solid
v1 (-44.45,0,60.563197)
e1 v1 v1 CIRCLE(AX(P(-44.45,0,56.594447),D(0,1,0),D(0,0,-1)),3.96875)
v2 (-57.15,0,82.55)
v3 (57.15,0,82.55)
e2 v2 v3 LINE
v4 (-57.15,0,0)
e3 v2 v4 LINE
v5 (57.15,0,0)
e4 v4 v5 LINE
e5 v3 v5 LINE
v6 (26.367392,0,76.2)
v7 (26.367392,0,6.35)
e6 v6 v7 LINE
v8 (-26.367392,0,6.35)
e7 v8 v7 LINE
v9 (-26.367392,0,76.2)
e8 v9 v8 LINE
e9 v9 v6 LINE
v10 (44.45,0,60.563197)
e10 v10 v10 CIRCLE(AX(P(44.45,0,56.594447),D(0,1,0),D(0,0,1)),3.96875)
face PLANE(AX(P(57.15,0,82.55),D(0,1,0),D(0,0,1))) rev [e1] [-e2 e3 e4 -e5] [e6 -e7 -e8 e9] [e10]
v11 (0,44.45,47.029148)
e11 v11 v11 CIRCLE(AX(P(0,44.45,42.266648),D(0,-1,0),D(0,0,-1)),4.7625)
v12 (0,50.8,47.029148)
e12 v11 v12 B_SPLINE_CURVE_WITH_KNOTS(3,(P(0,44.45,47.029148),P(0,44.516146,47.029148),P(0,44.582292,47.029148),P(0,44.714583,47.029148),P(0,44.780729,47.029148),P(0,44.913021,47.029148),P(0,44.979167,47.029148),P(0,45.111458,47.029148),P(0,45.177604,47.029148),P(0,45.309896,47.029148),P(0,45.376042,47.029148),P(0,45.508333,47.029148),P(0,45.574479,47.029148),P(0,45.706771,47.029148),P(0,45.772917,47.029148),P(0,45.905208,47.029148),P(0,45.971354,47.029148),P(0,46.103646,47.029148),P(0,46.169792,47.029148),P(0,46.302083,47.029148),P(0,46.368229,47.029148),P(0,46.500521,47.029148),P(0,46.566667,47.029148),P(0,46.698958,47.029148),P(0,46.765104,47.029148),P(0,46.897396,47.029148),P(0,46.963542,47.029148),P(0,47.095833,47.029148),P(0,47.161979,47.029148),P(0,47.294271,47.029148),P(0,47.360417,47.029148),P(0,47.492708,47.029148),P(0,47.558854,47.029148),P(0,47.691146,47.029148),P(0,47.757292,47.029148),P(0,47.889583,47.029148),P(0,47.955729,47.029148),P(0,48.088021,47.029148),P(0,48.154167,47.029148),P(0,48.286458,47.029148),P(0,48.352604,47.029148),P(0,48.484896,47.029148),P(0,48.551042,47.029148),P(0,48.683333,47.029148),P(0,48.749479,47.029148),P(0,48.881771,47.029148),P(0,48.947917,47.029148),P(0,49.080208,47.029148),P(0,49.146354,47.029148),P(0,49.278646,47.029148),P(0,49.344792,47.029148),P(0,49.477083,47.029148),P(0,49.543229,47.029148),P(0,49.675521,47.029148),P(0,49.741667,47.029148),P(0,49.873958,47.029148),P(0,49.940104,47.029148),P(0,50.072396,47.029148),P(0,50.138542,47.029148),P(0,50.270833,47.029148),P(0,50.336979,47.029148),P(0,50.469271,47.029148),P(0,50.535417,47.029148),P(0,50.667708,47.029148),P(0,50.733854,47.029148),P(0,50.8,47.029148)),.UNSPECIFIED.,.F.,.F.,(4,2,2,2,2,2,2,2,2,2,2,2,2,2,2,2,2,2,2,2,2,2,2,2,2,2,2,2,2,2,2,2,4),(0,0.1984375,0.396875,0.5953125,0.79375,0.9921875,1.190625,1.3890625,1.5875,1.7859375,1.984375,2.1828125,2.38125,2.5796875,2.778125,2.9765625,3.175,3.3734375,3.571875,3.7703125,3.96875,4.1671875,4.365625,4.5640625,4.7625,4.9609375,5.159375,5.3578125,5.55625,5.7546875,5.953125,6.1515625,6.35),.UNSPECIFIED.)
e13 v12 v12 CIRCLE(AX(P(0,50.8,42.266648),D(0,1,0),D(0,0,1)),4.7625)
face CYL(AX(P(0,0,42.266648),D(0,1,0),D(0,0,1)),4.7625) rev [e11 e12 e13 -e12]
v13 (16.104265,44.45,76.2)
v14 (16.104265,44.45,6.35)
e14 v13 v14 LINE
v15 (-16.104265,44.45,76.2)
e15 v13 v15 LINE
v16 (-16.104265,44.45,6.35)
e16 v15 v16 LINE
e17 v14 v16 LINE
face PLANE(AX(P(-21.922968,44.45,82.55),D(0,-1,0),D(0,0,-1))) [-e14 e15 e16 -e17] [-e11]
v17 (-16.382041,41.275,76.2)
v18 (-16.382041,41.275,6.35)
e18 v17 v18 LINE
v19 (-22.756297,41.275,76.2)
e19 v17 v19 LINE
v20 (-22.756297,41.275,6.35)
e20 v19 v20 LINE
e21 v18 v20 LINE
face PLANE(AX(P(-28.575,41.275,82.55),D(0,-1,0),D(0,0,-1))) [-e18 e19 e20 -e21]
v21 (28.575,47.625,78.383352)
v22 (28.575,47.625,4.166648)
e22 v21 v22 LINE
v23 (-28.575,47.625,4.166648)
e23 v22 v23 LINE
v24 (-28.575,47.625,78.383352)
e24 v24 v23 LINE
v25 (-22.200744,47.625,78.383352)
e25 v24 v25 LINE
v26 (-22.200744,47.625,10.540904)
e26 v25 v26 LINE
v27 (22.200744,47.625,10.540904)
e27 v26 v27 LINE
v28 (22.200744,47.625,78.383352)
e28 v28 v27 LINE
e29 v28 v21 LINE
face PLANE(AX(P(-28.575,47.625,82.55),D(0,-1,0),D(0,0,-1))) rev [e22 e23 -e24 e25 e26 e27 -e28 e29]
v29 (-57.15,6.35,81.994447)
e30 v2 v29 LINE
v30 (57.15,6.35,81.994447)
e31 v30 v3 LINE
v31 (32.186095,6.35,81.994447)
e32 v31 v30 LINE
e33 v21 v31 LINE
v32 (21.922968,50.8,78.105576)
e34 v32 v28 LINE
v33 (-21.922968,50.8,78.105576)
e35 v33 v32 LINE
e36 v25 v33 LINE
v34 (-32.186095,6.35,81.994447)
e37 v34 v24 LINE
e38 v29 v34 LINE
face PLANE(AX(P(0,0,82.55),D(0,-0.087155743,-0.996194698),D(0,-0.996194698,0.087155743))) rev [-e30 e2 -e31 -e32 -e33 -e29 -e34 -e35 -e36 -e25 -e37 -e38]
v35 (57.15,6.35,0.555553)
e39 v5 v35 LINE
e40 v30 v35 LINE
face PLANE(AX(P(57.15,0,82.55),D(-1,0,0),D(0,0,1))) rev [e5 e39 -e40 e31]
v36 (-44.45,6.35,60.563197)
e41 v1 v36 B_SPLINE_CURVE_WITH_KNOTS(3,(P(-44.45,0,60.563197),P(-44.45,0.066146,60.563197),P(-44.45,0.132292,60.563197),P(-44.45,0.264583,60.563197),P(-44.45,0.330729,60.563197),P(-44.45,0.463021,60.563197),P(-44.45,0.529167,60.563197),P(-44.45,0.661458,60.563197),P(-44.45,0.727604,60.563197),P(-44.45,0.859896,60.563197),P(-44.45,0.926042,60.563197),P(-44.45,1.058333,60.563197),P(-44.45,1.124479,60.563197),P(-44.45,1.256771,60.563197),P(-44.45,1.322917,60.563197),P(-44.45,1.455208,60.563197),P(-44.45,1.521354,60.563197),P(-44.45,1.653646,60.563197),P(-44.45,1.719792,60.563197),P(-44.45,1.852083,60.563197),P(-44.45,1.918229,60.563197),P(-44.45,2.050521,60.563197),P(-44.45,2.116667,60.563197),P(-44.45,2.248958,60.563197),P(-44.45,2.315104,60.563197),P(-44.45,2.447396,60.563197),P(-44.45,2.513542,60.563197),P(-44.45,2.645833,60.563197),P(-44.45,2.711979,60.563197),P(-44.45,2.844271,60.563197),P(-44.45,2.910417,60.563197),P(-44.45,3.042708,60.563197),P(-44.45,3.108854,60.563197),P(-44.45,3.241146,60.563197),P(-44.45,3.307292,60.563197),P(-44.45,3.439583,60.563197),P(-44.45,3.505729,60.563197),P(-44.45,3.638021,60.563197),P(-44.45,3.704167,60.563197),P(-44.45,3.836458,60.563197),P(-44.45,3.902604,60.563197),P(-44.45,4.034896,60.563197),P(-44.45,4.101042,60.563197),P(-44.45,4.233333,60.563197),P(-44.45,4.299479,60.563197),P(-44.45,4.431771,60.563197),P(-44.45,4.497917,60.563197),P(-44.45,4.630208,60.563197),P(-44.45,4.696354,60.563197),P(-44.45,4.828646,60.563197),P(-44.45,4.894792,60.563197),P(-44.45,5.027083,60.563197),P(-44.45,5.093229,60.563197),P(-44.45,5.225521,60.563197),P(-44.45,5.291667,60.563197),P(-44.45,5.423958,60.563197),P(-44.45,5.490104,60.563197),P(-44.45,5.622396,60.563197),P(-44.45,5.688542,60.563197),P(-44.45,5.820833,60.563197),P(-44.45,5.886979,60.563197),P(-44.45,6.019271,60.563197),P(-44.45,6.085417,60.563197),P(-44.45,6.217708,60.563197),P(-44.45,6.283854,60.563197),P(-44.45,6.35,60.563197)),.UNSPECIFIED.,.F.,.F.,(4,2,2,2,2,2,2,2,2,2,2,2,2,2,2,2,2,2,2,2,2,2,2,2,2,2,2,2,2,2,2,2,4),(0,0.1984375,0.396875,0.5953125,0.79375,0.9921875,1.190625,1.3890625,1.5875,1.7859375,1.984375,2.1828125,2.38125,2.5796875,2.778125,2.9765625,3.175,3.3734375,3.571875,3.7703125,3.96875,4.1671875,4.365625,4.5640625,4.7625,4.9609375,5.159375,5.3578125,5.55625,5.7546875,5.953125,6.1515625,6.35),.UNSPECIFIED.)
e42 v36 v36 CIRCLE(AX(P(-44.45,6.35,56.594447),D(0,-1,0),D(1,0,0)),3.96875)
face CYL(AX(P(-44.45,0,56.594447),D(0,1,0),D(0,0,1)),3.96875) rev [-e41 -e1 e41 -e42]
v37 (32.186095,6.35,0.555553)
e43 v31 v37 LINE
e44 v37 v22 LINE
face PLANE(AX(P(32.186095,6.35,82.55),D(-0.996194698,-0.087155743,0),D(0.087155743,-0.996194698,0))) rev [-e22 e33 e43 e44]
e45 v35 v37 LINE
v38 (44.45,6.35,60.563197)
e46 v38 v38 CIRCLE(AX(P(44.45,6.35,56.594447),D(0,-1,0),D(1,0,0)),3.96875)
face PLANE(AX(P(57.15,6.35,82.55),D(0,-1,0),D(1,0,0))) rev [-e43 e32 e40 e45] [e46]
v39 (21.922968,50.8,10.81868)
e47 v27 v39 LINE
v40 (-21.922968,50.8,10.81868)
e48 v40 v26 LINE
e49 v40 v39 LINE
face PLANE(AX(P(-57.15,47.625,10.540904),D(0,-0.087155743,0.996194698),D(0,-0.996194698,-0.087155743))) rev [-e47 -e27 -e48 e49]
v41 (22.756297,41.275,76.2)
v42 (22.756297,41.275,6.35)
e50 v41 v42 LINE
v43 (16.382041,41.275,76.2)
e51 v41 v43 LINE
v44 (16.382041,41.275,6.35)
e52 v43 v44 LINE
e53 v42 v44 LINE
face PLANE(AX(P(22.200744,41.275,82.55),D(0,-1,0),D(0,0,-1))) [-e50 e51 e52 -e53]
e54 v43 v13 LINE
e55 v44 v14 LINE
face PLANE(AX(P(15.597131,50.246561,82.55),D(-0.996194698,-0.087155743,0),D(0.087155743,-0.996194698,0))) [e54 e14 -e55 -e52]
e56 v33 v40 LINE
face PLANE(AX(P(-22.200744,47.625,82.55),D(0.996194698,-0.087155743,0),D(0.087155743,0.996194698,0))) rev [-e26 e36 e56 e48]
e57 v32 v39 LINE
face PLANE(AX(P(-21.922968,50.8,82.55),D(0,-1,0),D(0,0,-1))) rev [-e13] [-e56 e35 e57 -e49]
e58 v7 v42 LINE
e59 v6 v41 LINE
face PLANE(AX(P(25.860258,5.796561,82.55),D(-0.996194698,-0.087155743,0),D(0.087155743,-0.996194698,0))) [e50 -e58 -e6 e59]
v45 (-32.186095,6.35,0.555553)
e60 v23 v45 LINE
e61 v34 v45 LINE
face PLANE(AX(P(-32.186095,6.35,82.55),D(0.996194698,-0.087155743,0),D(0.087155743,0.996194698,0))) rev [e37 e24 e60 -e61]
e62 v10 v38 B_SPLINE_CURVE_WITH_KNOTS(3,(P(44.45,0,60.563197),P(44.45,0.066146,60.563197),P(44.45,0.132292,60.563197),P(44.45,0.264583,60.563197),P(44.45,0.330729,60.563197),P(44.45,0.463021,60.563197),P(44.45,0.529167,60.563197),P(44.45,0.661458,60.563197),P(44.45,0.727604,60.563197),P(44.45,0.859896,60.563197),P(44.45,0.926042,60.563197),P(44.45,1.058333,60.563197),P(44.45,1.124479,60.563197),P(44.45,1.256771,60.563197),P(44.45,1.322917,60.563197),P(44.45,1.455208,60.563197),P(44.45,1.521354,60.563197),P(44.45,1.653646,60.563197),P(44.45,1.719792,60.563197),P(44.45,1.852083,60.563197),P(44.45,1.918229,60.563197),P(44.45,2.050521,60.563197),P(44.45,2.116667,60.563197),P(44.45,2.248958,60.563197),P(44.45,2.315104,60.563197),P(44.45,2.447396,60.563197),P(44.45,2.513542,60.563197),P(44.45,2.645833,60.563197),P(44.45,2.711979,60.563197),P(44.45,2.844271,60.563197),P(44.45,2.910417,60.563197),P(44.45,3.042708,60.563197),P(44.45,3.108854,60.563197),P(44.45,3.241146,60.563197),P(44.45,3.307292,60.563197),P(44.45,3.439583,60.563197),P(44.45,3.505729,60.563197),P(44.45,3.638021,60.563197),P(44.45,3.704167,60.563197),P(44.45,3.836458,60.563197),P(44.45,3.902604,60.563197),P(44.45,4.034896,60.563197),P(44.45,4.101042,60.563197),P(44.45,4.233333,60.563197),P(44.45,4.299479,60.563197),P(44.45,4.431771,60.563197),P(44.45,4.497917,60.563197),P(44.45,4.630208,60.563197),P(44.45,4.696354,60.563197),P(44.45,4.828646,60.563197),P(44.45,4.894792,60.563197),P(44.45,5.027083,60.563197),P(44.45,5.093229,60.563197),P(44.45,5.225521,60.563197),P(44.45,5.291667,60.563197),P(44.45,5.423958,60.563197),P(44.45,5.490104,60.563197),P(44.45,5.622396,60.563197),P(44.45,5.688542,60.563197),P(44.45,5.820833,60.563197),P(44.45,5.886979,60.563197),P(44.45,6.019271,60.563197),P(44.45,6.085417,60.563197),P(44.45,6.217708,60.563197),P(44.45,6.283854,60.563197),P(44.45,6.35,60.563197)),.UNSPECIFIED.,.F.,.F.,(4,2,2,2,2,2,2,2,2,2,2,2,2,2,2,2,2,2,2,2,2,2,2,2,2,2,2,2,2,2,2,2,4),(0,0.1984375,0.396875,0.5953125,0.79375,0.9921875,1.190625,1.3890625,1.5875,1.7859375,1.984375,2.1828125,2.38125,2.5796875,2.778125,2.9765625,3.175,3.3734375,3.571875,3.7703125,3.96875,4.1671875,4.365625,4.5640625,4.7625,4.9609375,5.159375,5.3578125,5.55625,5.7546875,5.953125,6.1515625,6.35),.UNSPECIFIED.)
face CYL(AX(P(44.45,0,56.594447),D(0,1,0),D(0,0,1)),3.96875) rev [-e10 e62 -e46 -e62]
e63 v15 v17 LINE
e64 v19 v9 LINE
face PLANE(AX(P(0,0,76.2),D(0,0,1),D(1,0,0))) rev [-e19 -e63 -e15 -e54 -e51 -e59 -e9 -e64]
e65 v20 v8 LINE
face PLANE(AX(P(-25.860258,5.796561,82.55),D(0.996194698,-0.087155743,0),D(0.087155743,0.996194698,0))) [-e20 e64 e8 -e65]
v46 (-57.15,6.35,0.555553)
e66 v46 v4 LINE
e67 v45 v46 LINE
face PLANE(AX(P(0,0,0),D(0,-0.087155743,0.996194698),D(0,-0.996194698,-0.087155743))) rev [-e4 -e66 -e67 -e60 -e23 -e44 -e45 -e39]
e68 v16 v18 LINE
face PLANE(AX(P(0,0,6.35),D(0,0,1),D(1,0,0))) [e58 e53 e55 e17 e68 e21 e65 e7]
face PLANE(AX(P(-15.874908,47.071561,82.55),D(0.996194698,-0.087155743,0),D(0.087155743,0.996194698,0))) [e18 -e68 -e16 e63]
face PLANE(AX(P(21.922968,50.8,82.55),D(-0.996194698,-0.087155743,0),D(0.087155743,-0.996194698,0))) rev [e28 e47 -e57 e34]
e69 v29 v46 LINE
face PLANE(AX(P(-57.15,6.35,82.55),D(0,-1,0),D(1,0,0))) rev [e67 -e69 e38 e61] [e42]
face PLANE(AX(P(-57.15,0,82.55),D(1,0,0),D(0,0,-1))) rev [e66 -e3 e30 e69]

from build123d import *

# Parameters (mm, degrees)
BOSS_EXTRUDE1_DEPTH     = 82.55
SHELL1_START            = 6.35
SHELL1_DEPTH            = 69.85
SKETCH4_W               = 176.485735693
SKETCH4_H               = 90.097834431
CUT_EXTRUDE1_DEPTH      = 25.4
CUT_EXTRUDE2_DEPTH      = 113.522286681
CUT_EXTRUDE2_DEPTH_BACK = 113.522286681
SKETCH8_R               = 4.7625
SKETCH8_R_2             = 3.96875
CUT_EXTRUDE3_DEPTH      = 113.522286681


# Read off the part's stored shape, not the designer's step: Shell1
with BuildPart() as part:
    # Sketch1 → Boss-Extrude1 (new body)
    with BuildSketch(Plane.XY):
        Polygon((57.15, 0), (-57.15, 0), (-57.15, 6.35), (-32.186094587, 6.35), (-28.575, 47.625), (-22.200744032, 47.625), (-21.922967525, 50.8), (21.922967525, 50.8), (22.200744032, 47.625), (28.575, 47.625), (32.186094587, 6.35), (57.15, 6.35), align=None)
    extrude(amount=BOSS_EXTRUDE1_DEPTH)

    # Shell1 outline → Shell1 (cut)
    with BuildSketch(Plane.XY.offset(SHELL1_START)):
        Polygon((26.367391632, 0), (22.756297045, 41.275), (16.382041077, 41.275), (16.10426457, 44.45), (-16.10426457, 44.45), (-16.382041077, 41.275), (-22.756297045, 41.275), (-26.367391632, 0), align=None)
    extrude(amount=SHELL1_DEPTH, mode=Mode.SUBTRACT)

    # Sketch4 → Cut-Extrude1 (cut)
    with BuildSketch(Plane(origin=(0, 0, 0), x_dir=(1, 0, 0), z_dir=(0, 0.08715574274765504, -0.9961946980917459))):
        with Locations((12.432297096, -27.899571849)):
            Rectangle(SKETCH4_W, SKETCH4_H)
    cut_extrude1 = extrude(amount=CUT_EXTRUDE1_DEPTH, mode=Mode.SUBTRACT)

    # Sketch7 → Cut-Extrude2 (cut, two sides: drawn at the far end of the back side and taken through both)
    with BuildSketch(Plane(origin=(0, 0, 0), x_dir=(0, 0, -1), z_dir=(1, 0, 0)).offset(-CUT_EXTRUDE2_DEPTH_BACK)):
        Polygon((-4.1666476, 47.625), (-10.540903569, 47.625), (-10.818680076, 50.8), (-4.444424107, 50.8), align=None)
    extrude(amount=CUT_EXTRUDE2_DEPTH + CUT_EXTRUDE2_DEPTH_BACK, mode=Mode.SUBTRACT)

    # Mirror1: Cut-Extrude1 across plane
    add(cut_extrude1.mirror(Plane.XY.offset(41.275)), mode=Mode.SUBTRACT)

    # Sketch8 → Cut-Extrude3 (cut, through all)
    with BuildSketch(Plane(origin=(0, 50.8, 0), x_dir=(1, 0, 0), z_dir=(0, 1, 0))):
        with Locations(Location((0, -42.2666476, 0), (0, 0, 270))):
            Circle(SKETCH8_R)
        with Locations(Location((44.45, -56.594446987, 0), (0, 0, 270))):
            Circle(SKETCH8_R_2)
        with Locations(Location((-44.45, -56.594446987, 0), (0, 0, 270))):
            Circle(SKETCH8_R_2)
    extrude(amount=-CUT_EXTRUDE3_DEPTH, mode=Mode.SUBTRACT)


solid = part.part
